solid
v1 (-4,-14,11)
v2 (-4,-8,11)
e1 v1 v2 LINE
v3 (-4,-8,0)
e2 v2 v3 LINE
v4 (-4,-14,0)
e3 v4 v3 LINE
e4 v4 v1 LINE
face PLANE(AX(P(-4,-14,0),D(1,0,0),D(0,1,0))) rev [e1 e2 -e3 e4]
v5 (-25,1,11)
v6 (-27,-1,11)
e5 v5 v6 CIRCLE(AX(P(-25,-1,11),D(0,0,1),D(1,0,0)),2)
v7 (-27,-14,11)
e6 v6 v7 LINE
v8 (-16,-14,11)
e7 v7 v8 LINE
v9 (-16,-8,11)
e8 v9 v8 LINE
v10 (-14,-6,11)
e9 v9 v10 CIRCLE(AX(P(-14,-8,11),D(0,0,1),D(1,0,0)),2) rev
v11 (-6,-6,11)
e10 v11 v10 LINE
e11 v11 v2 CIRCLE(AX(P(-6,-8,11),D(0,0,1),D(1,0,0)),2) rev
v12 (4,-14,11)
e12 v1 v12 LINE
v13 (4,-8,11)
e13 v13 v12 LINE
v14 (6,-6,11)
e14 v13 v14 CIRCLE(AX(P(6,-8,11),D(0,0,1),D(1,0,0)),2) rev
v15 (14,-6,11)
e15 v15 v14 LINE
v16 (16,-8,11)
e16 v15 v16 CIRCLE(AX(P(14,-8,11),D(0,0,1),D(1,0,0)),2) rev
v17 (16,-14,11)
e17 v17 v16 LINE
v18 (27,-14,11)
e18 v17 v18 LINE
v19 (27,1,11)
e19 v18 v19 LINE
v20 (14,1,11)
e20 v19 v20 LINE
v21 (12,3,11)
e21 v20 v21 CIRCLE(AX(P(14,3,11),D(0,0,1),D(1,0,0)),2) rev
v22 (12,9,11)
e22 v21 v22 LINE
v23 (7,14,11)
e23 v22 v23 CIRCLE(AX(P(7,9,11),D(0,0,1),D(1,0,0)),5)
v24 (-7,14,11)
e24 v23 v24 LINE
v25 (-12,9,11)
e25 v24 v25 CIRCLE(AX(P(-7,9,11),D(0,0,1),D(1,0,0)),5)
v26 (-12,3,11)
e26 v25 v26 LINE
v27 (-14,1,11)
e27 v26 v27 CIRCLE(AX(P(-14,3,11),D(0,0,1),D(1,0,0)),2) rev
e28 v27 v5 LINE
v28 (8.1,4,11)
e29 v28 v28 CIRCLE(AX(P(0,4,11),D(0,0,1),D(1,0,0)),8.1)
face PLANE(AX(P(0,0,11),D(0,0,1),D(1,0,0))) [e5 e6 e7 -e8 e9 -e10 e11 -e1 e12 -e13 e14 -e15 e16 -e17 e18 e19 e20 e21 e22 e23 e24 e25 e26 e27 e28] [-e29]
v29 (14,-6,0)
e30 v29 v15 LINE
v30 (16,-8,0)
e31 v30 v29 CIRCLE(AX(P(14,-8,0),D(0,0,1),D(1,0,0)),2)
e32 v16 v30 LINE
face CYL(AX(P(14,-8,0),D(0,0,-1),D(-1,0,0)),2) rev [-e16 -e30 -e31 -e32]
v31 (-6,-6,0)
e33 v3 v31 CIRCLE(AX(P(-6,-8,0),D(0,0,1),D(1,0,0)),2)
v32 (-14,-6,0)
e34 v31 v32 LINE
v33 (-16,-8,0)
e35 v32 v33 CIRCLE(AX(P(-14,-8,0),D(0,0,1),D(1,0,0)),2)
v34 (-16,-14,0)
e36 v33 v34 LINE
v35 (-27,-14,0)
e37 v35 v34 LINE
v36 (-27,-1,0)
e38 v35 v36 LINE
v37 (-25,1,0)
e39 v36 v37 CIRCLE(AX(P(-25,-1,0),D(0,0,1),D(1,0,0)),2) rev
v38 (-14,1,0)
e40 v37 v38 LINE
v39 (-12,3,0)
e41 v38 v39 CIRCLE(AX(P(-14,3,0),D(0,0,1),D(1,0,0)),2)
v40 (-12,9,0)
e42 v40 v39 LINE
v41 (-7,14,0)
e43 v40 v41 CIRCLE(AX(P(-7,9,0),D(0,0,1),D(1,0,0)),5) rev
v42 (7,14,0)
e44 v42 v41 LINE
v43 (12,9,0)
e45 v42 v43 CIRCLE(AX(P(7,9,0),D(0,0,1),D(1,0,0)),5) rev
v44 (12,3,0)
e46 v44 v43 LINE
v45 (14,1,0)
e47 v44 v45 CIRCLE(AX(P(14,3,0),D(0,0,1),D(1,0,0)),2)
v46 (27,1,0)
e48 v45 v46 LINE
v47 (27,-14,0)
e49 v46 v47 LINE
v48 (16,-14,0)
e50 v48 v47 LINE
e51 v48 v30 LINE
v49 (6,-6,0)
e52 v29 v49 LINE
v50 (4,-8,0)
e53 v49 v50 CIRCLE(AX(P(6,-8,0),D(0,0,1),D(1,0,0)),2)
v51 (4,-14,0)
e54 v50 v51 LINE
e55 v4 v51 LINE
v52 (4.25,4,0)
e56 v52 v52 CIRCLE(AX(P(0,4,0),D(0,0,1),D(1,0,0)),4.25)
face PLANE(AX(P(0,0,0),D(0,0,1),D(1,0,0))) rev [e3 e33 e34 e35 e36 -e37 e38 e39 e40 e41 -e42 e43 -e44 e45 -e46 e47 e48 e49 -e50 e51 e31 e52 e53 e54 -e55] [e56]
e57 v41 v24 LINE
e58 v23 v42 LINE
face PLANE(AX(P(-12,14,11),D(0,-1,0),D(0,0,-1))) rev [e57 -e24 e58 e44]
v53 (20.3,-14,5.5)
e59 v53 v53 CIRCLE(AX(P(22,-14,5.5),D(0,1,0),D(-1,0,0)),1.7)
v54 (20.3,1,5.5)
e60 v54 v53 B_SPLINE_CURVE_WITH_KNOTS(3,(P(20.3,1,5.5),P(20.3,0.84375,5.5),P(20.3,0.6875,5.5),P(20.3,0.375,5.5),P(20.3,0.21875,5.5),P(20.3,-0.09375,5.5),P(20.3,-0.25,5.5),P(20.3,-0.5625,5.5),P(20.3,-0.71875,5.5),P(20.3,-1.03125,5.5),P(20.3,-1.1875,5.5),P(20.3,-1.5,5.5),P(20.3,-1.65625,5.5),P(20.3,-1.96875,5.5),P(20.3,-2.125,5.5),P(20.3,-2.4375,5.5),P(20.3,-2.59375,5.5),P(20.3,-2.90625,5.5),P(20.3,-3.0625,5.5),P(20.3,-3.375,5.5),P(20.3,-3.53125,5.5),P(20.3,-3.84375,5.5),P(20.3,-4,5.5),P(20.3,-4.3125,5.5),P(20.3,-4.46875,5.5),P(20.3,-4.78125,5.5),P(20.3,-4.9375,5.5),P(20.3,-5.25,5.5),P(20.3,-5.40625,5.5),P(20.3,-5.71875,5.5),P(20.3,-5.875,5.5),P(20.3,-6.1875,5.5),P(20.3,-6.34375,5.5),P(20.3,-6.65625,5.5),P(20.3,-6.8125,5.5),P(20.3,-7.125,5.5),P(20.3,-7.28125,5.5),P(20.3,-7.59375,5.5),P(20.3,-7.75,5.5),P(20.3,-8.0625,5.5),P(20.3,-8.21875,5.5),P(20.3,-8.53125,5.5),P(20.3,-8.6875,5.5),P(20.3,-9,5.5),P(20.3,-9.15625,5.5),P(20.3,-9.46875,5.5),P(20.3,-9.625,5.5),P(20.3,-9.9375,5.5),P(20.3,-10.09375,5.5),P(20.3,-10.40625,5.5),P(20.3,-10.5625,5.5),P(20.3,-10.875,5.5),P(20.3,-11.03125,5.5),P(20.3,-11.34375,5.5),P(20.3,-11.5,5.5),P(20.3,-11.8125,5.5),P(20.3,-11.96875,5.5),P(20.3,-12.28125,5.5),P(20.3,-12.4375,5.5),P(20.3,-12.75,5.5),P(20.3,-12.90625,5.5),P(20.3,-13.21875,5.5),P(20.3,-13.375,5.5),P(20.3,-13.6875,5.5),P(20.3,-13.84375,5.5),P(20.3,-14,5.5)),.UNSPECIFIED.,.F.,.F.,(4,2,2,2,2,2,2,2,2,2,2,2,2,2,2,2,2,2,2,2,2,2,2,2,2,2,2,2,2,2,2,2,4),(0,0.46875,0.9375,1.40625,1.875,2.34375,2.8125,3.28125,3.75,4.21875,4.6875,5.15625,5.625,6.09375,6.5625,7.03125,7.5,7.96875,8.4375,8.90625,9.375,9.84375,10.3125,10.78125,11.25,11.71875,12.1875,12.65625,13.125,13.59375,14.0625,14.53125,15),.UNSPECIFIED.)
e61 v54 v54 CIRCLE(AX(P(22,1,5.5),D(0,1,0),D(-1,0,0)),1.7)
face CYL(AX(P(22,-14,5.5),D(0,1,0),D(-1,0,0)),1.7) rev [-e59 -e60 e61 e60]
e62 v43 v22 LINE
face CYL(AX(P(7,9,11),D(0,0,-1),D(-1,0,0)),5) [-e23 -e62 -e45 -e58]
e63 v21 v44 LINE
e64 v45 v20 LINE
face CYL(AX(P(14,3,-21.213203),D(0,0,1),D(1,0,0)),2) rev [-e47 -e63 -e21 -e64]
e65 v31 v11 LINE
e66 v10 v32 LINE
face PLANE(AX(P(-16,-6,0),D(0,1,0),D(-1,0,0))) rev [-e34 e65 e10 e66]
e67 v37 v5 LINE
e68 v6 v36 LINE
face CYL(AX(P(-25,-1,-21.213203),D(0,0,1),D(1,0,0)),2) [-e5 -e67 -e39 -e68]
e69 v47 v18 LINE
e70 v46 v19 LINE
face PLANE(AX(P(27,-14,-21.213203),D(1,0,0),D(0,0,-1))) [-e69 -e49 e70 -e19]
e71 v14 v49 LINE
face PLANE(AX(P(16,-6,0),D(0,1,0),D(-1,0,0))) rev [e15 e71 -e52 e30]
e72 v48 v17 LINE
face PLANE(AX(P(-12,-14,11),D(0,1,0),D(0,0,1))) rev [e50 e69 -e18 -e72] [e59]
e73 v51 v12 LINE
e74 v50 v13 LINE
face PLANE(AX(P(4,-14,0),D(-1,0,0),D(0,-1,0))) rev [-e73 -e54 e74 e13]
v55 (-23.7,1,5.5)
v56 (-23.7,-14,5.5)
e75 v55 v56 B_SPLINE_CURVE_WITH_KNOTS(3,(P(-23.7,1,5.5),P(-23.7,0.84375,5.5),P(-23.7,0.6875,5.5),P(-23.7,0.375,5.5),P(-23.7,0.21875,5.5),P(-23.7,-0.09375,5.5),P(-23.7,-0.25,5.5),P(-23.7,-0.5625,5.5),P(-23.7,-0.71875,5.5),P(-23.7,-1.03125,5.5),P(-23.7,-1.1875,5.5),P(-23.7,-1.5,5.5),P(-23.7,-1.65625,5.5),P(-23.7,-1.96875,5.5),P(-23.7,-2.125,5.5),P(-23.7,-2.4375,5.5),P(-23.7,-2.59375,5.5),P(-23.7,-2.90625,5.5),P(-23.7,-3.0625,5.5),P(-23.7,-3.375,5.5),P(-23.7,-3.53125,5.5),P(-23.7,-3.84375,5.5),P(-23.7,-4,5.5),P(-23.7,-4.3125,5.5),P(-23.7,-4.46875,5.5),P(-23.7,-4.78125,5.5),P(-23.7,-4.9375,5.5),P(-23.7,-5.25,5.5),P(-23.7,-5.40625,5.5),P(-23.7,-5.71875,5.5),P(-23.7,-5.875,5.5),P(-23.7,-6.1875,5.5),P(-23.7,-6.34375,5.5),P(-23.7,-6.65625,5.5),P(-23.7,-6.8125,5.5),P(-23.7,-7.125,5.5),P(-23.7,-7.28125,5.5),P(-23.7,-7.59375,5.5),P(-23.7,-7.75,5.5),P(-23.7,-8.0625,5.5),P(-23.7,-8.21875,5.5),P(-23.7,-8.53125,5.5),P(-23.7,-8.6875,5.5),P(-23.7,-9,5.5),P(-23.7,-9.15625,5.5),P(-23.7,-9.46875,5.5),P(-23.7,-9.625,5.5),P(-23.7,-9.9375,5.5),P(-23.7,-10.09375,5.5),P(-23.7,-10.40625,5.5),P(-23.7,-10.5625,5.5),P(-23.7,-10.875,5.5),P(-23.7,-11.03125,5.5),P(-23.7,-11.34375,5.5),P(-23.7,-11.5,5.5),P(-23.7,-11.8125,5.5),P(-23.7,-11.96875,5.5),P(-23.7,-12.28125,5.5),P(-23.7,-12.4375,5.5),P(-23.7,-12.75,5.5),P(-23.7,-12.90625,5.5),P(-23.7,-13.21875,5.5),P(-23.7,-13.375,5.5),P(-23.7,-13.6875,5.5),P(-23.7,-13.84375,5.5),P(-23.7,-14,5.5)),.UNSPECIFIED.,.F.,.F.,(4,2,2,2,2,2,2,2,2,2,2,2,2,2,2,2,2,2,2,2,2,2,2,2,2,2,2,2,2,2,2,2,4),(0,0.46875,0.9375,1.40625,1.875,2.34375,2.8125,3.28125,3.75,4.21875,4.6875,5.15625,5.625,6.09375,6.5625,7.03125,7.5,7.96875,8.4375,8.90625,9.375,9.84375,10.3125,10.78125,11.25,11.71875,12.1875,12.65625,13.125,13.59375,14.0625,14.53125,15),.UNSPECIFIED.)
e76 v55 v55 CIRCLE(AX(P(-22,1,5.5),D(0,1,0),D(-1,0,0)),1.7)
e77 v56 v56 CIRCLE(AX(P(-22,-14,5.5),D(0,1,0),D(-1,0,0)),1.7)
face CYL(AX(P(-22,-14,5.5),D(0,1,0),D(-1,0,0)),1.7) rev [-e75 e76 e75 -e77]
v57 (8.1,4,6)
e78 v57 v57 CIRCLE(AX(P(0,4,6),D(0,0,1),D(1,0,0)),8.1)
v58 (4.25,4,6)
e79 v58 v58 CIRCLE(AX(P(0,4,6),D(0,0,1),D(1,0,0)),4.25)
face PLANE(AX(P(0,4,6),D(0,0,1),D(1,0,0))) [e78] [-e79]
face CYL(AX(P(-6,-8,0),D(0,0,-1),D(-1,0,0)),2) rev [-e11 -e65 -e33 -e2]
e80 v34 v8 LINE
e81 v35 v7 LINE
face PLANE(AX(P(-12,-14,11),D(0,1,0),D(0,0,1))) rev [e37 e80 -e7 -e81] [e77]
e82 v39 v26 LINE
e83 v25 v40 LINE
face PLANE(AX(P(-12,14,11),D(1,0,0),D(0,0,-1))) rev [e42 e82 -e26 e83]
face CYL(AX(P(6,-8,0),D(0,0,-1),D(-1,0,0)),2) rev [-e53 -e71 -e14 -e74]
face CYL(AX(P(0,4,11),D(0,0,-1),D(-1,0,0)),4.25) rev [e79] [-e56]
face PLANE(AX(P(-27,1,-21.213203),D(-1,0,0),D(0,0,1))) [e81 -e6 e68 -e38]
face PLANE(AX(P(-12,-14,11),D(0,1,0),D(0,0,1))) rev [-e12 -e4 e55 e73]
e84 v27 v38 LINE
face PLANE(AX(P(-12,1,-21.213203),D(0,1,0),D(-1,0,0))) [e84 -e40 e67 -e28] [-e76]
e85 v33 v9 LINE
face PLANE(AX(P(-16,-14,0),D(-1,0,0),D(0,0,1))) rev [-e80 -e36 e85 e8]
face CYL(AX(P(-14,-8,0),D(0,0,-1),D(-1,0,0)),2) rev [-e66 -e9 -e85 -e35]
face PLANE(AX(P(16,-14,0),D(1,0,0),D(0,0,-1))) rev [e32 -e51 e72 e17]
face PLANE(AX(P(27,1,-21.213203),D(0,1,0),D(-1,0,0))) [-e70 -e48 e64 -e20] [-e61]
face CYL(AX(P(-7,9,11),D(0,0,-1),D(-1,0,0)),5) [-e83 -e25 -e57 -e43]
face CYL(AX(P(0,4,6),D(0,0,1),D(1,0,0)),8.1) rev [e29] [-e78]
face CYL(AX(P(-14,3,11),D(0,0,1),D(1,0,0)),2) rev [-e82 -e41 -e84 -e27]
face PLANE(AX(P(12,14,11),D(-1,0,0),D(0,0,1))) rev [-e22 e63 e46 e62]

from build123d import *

# Parameters (mm, degrees)
SKETCH_1_W               = 24
SKETCH_1_H               = 28
SKETCH_1_R               = 4.25
EXTRUDE_1_DEPTH          = 11
SKETCH_2_R               = 8.1
CUT_EXTRUDE_1_DEPTH      = 5
SKETCH_6_W               = 15
SKETCH_6_H               = 15
EXTRUDE_2_DEPTH          = 11
CUT_EXTRUDE_3_DEPTH      = 33.787192622
CUT_EXTRUDE_3_DEPTH_BACK = 33.787192622
SKETCH_7_R               = 1.7
SKETCH_8_W               = 12
SKETCH_8_H               = 8
CUT_EXTRUDE_4_DEPTH      = 33.341923258
FILLET_1_R               = 2
FILLET_2_R               = 2
FILLET_3_R               = 5
SKETCH_9_R               = 1.7
EXTRUDE_3_DEPTH          = 25
CUT_EXTRUDE_5_DEPTH      = 25


with BuildPart() as part:
    # 草图1 → 凸台-拉伸1 (new body)
    with BuildSketch(Plane.XY):
        Rectangle(SKETCH_1_W, SKETCH_1_H)
        with Locations((0, 4)):
            Circle(SKETCH_1_R, mode=Mode.SUBTRACT)
    extrude(amount=EXTRUDE_1_DEPTH)

    # 草图2 → 切除-拉伸1 (cut)
    with BuildSketch(Plane.XY.offset(11)):
        with Locations((0, 4)):
            Circle(SKETCH_2_R)
    extrude(amount=-CUT_EXTRUDE_1_DEPTH, mode=Mode.SUBTRACT)

    # 草图6 → 凸台-拉伸2 (add)
    with BuildSketch(Plane.XY.offset(11)):
        with Locations((-19.5, -6.5)):
            Rectangle(SKETCH_6_W, SKETCH_6_H)
        with Locations((19.5, -6.5)):
            Rectangle(SKETCH_6_W, SKETCH_6_H)
    extrude(amount=-EXTRUDE_2_DEPTH)

    # 草图7 → 切除-拉伸3 (cut, two sides: drawn at the far end of the back side and taken through both)
    with BuildSketch(Plane(origin=(0, 1, 0), x_dir=(1, 0, 0), z_dir=(0, 1, 0)).offset(-CUT_EXTRUDE_3_DEPTH_BACK)):
        with Locations(Location((22, -5.5, 0), (0, 0, 180))):
            Circle(SKETCH_7_R)
        with Locations(Location((-22, -5.5, 0), (0, 0, 180))):
            Circle(SKETCH_7_R)
        with Locations(Location((10.5, -5.5, 0), (0, 0, 180))):
            Circle(SKETCH_7_R)
    extrude(amount=CUT_EXTRUDE_3_DEPTH + CUT_EXTRUDE_3_DEPTH_BACK, mode=Mode.SUBTRACT)

    # 草图8 → 切除-拉伸4 (cut, through all)
    with BuildSketch(Plane.XY.offset(11)):
        with Locations((-10, -10)):
            Rectangle(SKETCH_8_W, SKETCH_8_H)
        with Locations((10, -10)):
            Rectangle(SKETCH_8_W, SKETCH_8_H)
    extrude(amount=-CUT_EXTRUDE_4_DEPTH, mode=Mode.SUBTRACT)

    # 圆角1
    fillet_1_edges = [part.edges().sort_by_distance(p)[0] for p in [
        (-16, -6, 5.5),
        (-4, -6, 5.5),
        (4, -6, 5.5),
        (16, -6, 5.5),
    ]]
    fillet(fillet_1_edges, radius=FILLET_1_R)

    # 圆角2
    # the kernel refuses this fillet: 2 mm, written as the material it adds along each edge
    with BuildSketch(Plane(origin=(12, 1, 11), x_dir=(1, 0, 0), z_dir=(0, 0, -1))) as fillet_2_piece_1_section:
        with BuildLine():
            CenterArc((FILLET_2_R, -FILLET_2_R), FILLET_2_R, 90, 90)
            Line((0, -FILLET_2_R), (0, 0))
            Line((0, 0), (FILLET_2_R, 0))
        make_face()
    fillet_2_piece_1 = extrude(amount=9.7, mode=Mode.PRIVATE)
    fillet_2_piece_1 = fillet_2_piece_1 - Plane(origin=(10.5, 1.435440369, 5.5), x_dir=(-1, 0, 0), z_dir=(0, -1, 0)) * Cylinder(1.7, 28, mode=Mode.PRIVATE)
    add(fillet_2_piece_1)
    with BuildSketch(Plane(origin=(12, 1, 9.7), x_dir=(0, 1, 0), z_dir=(0, 0, -1))) as fillet_2_piece_2_section:
        with BuildLine():
            CenterArc((FILLET_2_R, FILLET_2_R), FILLET_2_R, 180, 90)
            Line((0, FILLET_2_R), (0, 0))
            Line((0, 0), (FILLET_2_R, 0))
        make_face()
    fillet_2_piece_2 = extrude(amount=9.7, mode=Mode.PRIVATE)
    fillet_2_piece_2 = fillet_2_piece_2 - Plane(origin=(10.5, 1.435440365, 5.5), x_dir=(-1, 0, 0), z_dir=(0, -1, 0)) * Cylinder(1.7, 28, mode=Mode.PRIVATE)
    add(fillet_2_piece_2)
    with BuildSketch(Plane(origin=(-12, 1, 11), x_dir=(-1, 0, 0), z_dir=(0, 0, -1))) as fillet_2_piece_3:
        with BuildLine():
            CenterArc((FILLET_2_R, FILLET_2_R), FILLET_2_R, 180, 90)
            Line((0, FILLET_2_R), (0, 0))
            Line((0, 0), (FILLET_2_R, 0))
        make_face()
    extrude(amount=11)
    # the kernel refuses this fillet: 2 mm, written as the material it takes off along each edge
    with BuildSketch(Plane(origin=(-27, 1, 16), x_dir=(0, -1, 0), z_dir=(0, 0, -1))) as fillet_2_2_piece_1:
        with BuildLine():
            CenterArc((FILLET_2_R, -FILLET_2_R), FILLET_2_R, 90, 90)
            Line((0, -FILLET_2_R), (0, 0))
            Line((0, 0), (FILLET_2_R, 0))
        make_face()
    extrude(amount=21, mode=Mode.SUBTRACT)

    # 圆角3
    # the kernel refuses this fillet: 5 mm, written as the material it takes off along each edge
    with BuildSketch(Plane(origin=(12, 14, -6.2), x_dir=(-1, 0, 0), z_dir=(0, 0, 1))) as fillet_3_piece_1:
        with BuildLine():
            CenterArc((FILLET_3_R, FILLET_3_R), FILLET_3_R, 180, 90)
            Line((0, FILLET_3_R), (0, 0))
            Line((0, 0), (FILLET_3_R, 0))
        make_face()
    extrude(amount=29.7, mode=Mode.SUBTRACT)
    with BuildSketch(Plane(origin=(-12, 14, -12.5), x_dir=(0, -1, 0), z_dir=(0, 0, 1))) as fillet_3_piece_2:
        with BuildLine():
            CenterArc((FILLET_3_R, FILLET_3_R), FILLET_3_R, 180, 90)
            Line((0, FILLET_3_R), (0, 0))
            Line((0, 0), (FILLET_3_R, 0))
        make_face()
    extrude(amount=36, mode=Mode.SUBTRACT)

    # 草图9 → 凸台-拉伸3 (add)
    with BuildSketch(Plane.XZ.offset(6)):
        with Locations((10.5, 5.5)):
            Circle(SKETCH_9_R)
    extrude(amount=-EXTRUDE_3_DEPTH)

    # 草图10 → 切除-拉伸5 (cut)
    with BuildSketch(Plane.XY.offset(11)):
        with BuildLine():
            Line((12, 3), (12, 9))
            ThreePointArc((12, 9), (10.535533906, 12.535533906), (7, 14))
            Line((7, 14), (7.594175957, 21.794622096))
            Line((7.594175957, 21.794622096), (15.452945432, 21.794622096))
            Line((15.452945432, 21.794622096), (16.462328667, 6.870169973))
            Line((16.462328667, 6.870169973), (14, 1))
            ThreePointArc((14, 1), (12.585786438, 1.585786438), (12, 3))
        make_face()
    extrude(amount=-CUT_EXTRUDE_5_DEPTH, mode=Mode.SUBTRACT)


solid = part.part
